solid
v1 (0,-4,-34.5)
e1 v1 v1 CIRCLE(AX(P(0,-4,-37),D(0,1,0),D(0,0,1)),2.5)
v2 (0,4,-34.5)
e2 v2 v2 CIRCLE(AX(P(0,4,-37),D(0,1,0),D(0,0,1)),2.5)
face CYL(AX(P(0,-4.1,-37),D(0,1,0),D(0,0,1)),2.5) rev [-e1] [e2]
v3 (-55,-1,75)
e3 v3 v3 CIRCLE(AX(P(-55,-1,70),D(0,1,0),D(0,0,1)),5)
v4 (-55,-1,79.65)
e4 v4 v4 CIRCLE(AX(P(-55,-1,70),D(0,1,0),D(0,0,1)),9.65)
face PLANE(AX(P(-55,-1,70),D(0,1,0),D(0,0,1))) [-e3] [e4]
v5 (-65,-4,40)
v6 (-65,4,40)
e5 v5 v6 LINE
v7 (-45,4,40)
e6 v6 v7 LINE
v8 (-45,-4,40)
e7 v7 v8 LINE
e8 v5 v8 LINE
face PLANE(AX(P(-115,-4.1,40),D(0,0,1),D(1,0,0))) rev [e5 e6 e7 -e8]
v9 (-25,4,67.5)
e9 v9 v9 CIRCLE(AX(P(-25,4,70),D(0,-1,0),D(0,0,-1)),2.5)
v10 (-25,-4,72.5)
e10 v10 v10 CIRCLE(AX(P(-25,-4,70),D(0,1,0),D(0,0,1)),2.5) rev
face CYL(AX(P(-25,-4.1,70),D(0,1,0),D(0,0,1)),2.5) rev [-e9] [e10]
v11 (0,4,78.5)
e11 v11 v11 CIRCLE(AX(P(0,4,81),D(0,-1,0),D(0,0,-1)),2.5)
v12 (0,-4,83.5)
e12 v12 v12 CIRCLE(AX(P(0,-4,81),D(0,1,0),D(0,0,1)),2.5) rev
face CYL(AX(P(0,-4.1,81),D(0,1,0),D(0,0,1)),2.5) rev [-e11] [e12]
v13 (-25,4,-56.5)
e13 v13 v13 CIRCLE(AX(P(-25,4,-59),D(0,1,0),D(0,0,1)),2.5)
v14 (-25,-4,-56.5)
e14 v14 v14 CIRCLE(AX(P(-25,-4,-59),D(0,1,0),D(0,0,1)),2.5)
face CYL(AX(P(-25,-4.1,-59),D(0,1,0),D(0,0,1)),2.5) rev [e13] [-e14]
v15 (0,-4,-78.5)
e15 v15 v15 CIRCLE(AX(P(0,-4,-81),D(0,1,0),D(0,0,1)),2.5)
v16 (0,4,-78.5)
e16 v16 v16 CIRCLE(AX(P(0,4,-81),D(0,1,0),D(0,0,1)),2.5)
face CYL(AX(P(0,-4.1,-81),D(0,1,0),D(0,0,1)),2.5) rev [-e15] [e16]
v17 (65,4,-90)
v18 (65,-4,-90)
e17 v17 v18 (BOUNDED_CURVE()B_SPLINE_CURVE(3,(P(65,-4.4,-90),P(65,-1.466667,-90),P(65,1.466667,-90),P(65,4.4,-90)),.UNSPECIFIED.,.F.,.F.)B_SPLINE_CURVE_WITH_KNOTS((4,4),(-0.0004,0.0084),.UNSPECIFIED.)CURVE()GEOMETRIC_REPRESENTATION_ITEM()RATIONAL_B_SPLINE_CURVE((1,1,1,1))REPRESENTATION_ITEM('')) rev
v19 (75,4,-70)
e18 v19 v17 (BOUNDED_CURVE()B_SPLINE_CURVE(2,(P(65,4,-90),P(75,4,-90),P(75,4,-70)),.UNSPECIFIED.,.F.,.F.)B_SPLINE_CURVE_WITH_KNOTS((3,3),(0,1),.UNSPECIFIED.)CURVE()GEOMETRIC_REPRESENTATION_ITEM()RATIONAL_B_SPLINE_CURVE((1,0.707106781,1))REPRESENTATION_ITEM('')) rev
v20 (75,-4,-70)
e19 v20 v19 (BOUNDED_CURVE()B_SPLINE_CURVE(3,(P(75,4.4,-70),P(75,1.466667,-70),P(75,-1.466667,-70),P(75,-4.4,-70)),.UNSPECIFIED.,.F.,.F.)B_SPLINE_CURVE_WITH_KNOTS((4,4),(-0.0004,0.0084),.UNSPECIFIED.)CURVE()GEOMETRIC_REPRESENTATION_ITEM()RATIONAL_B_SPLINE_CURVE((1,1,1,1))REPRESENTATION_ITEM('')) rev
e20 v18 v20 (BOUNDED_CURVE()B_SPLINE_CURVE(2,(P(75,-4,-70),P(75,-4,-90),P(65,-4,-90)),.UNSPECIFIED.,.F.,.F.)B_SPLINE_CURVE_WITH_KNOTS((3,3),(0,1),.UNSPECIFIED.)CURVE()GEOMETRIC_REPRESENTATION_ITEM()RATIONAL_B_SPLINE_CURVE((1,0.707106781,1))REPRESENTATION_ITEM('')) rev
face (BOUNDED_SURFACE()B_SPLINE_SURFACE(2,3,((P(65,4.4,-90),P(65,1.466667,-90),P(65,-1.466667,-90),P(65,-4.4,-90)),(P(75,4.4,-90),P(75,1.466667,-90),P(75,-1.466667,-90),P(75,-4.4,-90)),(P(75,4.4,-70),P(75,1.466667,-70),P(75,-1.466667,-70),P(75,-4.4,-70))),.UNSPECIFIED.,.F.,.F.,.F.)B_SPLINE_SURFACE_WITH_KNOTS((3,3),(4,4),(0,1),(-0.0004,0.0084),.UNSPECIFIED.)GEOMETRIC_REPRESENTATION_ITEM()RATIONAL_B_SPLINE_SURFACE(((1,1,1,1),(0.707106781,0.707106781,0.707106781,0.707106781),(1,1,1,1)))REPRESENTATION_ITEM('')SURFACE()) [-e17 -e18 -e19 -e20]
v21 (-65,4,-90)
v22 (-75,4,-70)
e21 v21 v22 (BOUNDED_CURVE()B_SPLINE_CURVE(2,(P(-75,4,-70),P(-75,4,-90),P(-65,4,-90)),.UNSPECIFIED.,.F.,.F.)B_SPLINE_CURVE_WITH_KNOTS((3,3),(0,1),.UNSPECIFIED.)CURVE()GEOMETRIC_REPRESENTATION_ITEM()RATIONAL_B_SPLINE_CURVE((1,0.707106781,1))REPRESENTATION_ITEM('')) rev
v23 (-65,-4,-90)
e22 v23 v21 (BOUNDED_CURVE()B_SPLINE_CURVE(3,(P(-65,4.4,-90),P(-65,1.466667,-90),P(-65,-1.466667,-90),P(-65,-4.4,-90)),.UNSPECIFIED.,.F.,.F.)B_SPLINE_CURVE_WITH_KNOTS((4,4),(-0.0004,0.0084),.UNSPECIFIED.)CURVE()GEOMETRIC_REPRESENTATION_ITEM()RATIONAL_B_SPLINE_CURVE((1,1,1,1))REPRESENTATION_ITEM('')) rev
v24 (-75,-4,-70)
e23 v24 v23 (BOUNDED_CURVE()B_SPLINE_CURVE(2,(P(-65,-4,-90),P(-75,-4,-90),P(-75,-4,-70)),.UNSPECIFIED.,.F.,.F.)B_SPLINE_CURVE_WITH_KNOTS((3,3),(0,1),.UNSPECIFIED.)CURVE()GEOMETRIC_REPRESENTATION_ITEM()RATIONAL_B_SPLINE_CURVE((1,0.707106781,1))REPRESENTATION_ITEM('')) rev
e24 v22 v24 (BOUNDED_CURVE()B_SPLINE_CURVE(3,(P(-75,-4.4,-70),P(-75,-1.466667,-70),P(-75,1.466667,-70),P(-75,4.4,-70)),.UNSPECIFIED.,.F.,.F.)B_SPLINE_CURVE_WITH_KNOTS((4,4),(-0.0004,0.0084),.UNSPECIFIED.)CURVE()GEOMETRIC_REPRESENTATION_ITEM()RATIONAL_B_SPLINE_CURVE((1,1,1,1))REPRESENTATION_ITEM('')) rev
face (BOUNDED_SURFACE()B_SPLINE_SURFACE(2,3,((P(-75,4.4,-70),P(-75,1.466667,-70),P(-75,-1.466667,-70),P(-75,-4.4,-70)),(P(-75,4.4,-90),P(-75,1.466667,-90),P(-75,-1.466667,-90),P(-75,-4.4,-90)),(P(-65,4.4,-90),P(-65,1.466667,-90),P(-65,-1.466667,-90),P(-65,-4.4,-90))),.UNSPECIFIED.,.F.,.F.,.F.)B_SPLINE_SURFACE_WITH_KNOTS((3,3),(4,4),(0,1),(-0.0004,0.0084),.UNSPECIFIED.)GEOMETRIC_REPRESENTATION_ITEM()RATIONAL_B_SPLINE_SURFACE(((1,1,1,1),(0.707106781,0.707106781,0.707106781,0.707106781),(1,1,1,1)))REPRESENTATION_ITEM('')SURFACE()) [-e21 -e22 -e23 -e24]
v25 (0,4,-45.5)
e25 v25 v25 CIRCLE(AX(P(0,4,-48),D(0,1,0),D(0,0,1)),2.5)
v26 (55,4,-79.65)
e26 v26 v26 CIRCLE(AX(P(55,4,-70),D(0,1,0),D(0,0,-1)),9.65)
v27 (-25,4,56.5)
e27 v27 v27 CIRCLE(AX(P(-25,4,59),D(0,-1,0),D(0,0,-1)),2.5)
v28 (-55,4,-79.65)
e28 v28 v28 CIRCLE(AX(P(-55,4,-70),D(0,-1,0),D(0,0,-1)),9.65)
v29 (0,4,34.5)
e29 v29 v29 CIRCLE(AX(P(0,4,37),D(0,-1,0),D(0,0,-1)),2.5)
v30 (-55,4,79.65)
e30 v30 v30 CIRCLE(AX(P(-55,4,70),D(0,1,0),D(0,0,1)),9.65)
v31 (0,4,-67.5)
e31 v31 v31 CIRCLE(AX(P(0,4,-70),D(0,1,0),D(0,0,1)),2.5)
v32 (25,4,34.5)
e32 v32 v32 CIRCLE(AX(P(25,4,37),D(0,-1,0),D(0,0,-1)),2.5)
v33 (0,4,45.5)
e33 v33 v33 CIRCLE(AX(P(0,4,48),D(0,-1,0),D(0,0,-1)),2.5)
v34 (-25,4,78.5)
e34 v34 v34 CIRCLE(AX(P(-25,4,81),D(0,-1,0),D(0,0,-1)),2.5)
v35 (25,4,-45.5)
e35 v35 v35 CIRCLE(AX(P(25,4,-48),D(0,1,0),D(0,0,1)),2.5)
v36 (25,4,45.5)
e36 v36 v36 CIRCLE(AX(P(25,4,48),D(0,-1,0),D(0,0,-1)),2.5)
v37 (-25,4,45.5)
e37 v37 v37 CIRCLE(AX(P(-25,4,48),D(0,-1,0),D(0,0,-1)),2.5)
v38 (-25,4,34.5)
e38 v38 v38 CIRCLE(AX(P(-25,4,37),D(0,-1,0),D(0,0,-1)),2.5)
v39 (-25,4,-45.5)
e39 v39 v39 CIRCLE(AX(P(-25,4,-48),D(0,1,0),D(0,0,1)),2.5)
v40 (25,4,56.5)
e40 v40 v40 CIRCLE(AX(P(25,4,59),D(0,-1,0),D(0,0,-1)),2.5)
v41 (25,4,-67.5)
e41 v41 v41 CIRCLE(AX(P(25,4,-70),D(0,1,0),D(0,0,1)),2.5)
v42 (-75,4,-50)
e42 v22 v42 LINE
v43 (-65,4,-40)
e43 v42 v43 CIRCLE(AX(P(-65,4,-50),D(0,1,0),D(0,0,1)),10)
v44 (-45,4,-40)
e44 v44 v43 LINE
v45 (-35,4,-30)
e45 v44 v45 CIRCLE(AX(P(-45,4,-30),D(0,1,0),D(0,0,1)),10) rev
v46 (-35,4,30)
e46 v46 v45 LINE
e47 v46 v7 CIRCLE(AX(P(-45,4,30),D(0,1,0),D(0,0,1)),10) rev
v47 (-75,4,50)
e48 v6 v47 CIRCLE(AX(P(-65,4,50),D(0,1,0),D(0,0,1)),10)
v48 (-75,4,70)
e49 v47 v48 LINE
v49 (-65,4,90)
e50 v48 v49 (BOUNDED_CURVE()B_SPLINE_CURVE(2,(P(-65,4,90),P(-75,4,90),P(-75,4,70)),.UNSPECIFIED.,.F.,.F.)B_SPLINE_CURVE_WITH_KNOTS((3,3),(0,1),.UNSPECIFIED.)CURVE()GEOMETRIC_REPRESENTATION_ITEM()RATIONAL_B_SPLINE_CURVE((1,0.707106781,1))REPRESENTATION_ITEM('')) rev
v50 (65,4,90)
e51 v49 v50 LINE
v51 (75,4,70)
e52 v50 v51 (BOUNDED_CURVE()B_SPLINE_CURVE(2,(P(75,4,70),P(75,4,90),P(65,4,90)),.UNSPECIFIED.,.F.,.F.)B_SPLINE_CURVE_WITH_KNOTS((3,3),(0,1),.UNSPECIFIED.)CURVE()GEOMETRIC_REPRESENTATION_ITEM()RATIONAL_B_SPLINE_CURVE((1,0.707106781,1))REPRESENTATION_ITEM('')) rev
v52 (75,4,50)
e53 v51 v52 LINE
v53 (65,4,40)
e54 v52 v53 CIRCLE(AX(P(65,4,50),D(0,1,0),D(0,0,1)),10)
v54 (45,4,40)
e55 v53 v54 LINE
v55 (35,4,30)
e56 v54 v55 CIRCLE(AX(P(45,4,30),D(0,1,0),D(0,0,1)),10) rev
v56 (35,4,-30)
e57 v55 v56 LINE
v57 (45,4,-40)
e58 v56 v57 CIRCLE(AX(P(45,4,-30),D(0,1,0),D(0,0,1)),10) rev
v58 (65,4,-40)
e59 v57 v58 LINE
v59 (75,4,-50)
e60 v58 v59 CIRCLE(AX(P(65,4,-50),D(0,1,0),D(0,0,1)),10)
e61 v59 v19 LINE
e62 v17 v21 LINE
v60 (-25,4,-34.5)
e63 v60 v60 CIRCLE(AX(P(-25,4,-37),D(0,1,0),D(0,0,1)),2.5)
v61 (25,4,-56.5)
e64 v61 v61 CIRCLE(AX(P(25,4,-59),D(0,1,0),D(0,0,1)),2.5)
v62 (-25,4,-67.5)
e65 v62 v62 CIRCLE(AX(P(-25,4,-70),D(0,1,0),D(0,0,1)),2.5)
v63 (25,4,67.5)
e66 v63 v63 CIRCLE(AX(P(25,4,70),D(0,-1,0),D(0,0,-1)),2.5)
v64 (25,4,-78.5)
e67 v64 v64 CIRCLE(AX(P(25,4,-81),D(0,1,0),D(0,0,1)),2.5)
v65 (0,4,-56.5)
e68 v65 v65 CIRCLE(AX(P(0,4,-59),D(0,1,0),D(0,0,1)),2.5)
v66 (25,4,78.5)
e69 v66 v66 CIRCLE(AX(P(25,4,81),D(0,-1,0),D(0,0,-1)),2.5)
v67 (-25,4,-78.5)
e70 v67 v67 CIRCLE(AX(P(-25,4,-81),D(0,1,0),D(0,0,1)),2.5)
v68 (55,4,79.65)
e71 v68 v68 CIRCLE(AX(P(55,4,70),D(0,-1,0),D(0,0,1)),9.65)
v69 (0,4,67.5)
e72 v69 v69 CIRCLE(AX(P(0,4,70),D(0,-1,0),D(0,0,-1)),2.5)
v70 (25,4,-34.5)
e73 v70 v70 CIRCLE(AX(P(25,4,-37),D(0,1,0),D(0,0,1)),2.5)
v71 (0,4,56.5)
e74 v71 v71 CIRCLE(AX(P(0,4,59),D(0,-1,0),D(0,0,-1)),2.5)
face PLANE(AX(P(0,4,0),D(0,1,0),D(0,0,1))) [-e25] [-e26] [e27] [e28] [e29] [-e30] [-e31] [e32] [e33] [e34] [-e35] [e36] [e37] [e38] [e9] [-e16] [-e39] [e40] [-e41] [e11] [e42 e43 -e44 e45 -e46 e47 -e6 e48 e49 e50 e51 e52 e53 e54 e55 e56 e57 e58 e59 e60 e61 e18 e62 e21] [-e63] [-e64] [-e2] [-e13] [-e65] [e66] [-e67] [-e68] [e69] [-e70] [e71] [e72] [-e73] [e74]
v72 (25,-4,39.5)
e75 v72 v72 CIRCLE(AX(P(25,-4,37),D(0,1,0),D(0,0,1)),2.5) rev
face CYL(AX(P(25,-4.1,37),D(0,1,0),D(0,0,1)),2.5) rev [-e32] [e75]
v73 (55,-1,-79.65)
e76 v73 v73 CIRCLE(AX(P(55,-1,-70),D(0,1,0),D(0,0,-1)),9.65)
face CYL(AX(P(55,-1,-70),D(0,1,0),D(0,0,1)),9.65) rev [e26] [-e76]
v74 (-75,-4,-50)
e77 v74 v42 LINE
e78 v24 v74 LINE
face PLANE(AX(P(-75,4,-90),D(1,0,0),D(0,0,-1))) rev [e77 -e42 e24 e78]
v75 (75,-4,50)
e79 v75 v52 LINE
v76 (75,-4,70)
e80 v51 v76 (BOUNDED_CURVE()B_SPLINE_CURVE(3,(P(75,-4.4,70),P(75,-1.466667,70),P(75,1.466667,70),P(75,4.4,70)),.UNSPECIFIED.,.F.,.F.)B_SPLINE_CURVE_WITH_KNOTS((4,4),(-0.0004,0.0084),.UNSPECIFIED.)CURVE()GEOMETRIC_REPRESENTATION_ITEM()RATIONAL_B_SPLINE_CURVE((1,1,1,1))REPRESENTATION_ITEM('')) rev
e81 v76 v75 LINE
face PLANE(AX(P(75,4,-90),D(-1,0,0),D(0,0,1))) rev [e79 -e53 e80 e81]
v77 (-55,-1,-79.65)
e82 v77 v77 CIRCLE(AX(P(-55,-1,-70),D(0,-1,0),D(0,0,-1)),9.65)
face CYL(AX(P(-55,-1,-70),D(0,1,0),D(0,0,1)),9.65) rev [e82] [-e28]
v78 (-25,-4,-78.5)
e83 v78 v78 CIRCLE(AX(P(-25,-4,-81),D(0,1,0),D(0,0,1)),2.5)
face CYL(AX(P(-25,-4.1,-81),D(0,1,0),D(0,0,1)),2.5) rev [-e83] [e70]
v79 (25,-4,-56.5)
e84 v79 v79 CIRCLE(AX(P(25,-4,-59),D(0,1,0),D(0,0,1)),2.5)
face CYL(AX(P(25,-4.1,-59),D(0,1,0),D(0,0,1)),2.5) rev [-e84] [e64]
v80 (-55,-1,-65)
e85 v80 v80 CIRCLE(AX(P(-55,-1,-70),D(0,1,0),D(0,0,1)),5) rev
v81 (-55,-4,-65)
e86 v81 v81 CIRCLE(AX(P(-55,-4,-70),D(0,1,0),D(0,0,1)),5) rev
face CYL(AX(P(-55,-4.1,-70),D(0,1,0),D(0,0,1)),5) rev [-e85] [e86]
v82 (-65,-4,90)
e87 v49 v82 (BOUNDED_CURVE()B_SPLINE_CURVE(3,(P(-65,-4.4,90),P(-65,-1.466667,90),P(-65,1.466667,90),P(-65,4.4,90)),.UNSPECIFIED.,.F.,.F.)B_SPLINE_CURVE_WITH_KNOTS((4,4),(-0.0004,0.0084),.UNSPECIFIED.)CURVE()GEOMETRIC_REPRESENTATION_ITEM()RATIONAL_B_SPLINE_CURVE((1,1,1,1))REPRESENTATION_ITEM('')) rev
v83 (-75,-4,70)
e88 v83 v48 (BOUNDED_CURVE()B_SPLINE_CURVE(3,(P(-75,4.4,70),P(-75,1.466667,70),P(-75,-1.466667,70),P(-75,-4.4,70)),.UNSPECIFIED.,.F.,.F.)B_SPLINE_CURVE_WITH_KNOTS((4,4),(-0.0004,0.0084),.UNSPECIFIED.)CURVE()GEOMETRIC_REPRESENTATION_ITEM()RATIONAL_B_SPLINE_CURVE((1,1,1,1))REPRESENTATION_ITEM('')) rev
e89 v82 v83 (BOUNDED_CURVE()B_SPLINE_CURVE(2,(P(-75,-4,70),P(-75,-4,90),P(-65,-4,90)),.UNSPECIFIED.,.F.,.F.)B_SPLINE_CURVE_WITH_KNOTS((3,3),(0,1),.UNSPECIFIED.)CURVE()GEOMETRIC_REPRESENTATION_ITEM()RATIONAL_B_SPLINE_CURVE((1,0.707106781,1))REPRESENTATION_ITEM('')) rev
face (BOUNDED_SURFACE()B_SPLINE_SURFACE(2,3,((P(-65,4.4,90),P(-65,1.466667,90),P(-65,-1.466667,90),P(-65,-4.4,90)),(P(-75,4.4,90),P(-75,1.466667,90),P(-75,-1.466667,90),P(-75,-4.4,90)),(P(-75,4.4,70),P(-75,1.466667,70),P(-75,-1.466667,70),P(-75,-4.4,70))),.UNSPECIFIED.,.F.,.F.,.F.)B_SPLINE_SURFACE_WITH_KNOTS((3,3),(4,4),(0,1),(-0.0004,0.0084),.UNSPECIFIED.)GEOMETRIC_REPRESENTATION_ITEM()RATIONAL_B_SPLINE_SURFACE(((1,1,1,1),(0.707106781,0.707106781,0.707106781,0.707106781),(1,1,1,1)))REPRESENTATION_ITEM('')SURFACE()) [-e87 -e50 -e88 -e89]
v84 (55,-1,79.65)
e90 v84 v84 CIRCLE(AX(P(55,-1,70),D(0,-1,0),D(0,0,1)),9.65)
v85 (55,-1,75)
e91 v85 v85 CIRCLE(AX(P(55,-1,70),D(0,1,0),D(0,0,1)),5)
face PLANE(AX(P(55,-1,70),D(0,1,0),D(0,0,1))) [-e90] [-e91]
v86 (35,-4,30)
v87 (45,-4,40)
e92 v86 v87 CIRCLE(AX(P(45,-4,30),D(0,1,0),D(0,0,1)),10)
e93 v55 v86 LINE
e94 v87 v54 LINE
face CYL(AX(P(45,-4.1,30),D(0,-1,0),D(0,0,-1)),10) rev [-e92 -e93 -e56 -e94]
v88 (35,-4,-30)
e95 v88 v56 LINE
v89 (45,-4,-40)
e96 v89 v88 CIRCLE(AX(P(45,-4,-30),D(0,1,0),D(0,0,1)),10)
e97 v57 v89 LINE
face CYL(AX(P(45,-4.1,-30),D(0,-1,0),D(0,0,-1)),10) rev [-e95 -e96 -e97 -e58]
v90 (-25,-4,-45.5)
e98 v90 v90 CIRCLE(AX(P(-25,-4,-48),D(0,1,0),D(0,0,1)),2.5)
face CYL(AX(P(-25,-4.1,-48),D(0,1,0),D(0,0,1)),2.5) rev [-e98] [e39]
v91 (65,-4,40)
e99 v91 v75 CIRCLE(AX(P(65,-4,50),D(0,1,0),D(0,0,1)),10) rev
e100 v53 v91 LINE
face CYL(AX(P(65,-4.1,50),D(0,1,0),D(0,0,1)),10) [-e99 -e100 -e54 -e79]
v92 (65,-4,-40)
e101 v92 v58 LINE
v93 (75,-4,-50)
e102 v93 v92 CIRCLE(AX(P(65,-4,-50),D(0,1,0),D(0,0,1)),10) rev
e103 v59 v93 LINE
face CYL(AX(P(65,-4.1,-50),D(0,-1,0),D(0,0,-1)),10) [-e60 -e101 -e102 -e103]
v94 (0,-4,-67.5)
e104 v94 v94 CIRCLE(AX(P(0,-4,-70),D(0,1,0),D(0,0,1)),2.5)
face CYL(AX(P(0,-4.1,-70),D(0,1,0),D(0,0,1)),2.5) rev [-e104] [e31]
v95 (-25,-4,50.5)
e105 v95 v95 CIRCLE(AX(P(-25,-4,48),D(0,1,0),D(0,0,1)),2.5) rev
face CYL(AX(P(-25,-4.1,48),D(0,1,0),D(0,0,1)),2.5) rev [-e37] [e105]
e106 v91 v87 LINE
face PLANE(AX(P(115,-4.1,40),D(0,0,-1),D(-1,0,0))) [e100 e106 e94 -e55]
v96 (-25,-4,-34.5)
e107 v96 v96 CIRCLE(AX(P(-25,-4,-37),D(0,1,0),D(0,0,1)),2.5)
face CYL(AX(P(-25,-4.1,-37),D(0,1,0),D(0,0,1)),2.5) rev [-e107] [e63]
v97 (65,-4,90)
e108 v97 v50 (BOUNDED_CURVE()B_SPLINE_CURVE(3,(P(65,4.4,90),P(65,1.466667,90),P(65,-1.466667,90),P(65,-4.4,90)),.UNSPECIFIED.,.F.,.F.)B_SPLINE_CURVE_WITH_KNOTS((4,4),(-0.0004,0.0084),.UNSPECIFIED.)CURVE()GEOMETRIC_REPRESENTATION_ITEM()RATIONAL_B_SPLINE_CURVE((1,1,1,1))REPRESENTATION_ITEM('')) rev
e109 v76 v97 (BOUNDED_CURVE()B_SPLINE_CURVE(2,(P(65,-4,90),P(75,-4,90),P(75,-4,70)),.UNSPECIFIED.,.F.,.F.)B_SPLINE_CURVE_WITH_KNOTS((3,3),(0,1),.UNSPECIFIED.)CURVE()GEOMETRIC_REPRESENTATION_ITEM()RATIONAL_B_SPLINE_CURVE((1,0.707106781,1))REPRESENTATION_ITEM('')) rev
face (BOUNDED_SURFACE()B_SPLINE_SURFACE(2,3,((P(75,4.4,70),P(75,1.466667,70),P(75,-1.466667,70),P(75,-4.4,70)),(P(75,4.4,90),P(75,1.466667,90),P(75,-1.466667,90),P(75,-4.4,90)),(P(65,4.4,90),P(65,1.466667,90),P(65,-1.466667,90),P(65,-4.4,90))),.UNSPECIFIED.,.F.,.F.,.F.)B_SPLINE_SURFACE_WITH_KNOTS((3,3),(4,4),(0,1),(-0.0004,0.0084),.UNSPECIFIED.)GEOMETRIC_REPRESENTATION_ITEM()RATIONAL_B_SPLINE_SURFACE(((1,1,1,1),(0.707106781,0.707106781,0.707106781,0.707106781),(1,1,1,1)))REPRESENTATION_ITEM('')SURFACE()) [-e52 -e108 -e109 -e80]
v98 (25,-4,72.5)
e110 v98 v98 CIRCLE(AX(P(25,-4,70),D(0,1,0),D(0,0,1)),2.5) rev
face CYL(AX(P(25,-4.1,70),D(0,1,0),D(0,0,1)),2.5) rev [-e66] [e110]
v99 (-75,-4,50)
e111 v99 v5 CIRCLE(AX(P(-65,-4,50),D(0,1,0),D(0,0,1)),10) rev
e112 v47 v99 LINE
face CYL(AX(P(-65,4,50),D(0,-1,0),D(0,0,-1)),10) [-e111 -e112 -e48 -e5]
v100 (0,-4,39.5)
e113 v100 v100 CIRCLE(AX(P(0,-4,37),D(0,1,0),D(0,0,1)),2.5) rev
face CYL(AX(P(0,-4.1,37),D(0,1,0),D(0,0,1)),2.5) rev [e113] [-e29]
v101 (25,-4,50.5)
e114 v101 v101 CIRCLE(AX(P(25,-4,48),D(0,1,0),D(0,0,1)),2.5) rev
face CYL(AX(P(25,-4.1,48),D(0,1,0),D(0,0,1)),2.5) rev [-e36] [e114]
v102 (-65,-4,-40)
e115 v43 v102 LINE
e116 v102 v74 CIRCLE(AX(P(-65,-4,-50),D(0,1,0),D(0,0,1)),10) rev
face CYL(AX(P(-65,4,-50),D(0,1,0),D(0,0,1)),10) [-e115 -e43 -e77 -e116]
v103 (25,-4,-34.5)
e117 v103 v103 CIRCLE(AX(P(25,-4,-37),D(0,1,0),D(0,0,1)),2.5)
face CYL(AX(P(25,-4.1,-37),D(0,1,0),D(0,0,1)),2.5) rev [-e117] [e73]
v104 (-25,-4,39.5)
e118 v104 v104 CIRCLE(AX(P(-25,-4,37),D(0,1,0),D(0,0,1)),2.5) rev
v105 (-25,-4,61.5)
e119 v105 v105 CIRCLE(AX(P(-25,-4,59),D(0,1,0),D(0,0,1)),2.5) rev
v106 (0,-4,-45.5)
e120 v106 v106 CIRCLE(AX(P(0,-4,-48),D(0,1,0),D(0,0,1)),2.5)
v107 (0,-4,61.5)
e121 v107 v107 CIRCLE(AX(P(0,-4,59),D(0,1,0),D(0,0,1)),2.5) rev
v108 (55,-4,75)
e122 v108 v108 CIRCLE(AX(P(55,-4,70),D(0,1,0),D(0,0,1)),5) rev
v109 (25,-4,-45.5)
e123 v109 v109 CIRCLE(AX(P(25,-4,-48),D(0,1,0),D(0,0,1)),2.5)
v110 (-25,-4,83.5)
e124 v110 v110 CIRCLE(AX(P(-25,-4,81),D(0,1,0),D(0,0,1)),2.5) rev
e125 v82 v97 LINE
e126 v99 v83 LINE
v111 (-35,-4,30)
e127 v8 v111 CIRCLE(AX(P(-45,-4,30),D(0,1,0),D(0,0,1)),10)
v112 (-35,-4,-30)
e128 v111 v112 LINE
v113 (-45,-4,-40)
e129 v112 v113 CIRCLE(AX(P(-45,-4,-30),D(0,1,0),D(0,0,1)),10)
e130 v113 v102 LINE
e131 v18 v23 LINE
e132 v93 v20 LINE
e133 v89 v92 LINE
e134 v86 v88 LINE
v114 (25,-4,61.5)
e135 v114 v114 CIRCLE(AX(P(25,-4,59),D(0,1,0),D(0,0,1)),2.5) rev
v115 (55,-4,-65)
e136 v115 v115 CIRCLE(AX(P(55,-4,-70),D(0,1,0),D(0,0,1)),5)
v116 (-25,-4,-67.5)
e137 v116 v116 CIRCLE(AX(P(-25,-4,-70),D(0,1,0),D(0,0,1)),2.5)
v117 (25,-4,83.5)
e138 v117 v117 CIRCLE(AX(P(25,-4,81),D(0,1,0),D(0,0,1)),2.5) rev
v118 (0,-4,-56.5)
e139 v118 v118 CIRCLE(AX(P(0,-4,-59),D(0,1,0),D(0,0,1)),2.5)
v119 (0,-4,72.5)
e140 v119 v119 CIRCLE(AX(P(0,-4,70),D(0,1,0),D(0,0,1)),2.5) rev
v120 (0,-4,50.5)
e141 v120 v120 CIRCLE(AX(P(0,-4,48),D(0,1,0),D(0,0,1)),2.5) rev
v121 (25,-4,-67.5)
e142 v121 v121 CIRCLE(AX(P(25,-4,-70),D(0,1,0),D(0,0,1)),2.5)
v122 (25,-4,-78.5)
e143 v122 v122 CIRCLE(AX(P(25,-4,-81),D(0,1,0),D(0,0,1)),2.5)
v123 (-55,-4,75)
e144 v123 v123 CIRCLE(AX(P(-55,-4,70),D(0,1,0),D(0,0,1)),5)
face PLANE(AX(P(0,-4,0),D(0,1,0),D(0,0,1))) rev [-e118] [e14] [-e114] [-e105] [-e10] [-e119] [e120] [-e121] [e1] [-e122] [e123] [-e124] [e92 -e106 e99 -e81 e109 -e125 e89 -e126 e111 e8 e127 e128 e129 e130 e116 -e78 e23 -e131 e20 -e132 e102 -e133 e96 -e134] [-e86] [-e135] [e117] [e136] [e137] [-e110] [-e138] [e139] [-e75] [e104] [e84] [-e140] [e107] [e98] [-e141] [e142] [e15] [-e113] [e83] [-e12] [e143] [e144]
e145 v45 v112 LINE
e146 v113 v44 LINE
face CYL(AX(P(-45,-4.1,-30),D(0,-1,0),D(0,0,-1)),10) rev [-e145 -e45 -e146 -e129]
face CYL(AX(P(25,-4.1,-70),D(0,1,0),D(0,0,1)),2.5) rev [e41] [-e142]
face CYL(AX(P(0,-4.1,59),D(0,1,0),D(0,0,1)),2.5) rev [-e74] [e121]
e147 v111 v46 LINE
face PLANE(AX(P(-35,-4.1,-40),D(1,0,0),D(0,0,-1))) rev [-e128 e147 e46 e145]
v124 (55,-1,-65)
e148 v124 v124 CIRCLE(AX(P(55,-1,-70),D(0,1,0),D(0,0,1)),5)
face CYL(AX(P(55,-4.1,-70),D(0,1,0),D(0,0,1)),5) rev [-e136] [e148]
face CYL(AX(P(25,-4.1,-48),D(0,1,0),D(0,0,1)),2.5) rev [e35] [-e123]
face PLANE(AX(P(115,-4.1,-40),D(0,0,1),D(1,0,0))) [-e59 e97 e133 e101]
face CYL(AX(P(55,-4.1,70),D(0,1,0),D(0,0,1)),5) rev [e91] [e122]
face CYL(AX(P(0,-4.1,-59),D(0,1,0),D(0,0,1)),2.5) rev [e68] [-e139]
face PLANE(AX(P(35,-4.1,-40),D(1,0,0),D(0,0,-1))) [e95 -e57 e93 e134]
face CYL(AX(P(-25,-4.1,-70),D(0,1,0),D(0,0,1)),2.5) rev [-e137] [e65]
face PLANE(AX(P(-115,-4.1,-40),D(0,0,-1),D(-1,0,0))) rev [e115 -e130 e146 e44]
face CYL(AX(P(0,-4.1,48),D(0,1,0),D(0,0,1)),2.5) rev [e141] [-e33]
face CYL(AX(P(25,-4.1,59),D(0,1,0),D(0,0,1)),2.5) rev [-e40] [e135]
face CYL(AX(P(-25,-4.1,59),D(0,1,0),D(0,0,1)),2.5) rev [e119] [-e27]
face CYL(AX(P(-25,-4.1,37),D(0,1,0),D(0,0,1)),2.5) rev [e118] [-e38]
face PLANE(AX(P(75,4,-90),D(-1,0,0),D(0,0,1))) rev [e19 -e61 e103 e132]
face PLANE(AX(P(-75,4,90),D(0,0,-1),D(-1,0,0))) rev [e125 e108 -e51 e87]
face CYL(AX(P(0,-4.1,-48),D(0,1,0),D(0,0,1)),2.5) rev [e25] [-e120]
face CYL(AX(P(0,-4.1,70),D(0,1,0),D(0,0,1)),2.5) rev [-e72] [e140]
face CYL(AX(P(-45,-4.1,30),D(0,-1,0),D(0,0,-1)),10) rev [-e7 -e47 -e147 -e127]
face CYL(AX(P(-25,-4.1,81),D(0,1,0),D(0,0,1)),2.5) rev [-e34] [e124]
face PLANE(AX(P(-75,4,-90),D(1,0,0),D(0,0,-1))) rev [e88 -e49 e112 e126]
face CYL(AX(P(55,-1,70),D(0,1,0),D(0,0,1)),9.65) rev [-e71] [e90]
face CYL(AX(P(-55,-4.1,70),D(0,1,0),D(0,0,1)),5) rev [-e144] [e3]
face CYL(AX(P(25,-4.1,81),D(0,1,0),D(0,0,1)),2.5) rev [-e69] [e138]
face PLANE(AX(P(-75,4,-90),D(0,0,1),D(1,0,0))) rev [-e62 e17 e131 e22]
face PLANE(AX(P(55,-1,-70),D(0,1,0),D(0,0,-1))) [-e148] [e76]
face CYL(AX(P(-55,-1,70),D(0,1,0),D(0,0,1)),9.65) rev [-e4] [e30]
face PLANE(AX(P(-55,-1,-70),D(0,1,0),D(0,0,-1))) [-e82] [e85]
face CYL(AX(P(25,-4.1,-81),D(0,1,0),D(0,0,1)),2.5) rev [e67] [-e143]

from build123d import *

# Parameters (mm, degrees)
SKETCH2_W               = 150
SKETCH2_H               = 180
BOSS_EXTRUDE1_DEPTH     = 4
FILLET1_SIZE            = 10
FILLET1_SIZE_2          = 20
FILLET2_SIZE            = 10
FILLET2_SIZE_2          = 20
SKETCH3_R               = 9.65
CUT_EXTRUDE1_DEPTH      = 5
SKETCH7_R               = 5
CUT_EXTRUDE4_DEPTH      = 118.426572949
MIRROR2_COPY_1_SKETCH_R = 9.65
MIRROR2_COPY_1_DEPTH    = 5
MIRROR2_COPY_2_SKETCH_R = 5
MIRROR2_COPY_2_DEPTH    = 118.426572949
SKETCH4_W               = 80
SKETCH4_H               = 80
CUT_EXTRUDE2_DEPTH      = 118.426572949
FILLET3_R               = 10
SKETCH6_R               = 2.5
CUT_EXTRUDE3_DEPTH      = 118.426572949


with BuildPart() as part:
    # Sketch2 → Boss-Extrude1 (new, symmetric)
    with BuildSketch(Plane(origin=(0, 0, 0), x_dir=(1, 0, 0), z_dir=(0, 1, 0))):
        Rectangle(SKETCH2_W, SKETCH2_H)
    extrude(amount=BOSS_EXTRUDE1_DEPTH, both=True)

    # Fillet1
    # an asymmetric fillet: 20, 10 mm, written as the material it takes off along each edge
    with BuildSketch(Plane(origin=(-75, -54, -90), x_dir=(1, 0, 0), z_dir=(0, 1, 0))) as fillet1_piece_1:
        with BuildLine():
            Bezier((FILLET1_SIZE, 0), (0, 0), (0, -FILLET1_SIZE_2), weights=[1, 0.707106781, 1])
            Line((0, -FILLET1_SIZE_2), (0, 0))
            Line((0, 0), (FILLET1_SIZE, 0))
        make_face()
    extrude(amount=108, mode=Mode.SUBTRACT)
    with BuildSketch(Plane(origin=(75, 54, 90), x_dir=(-1, 0, 0), z_dir=(0, -1, 0))) as fillet1_piece_2:
        with BuildLine():
            Bezier((FILLET1_SIZE, 0), (0, 0), (0, FILLET1_SIZE_2), weights=[1, 0.707106781, 1])
            Line((0, FILLET1_SIZE_2), (0, 0))
            Line((0, 0), (FILLET1_SIZE, 0))
        make_face()
    extrude(amount=108, mode=Mode.SUBTRACT)

    # Fillet2
    # an asymmetric fillet: 20, 10 mm, written as the material it takes off along each edge
    with BuildSketch(Plane(origin=(75, 54, -90), x_dir=(-1, 0, 0), z_dir=(0, -1, 0))) as fillet2_piece_1:
        with BuildLine():
            Bezier((FILLET2_SIZE, 0), (0, 0), (0, -FILLET2_SIZE_2), weights=[1, 0.707106781, 1])
            Line((0, -FILLET2_SIZE_2), (0, 0))
            Line((0, 0), (FILLET2_SIZE, 0))
        make_face()
    extrude(amount=108, mode=Mode.SUBTRACT)
    with BuildSketch(Plane(origin=(-75, -54, 90), x_dir=(0, 0, -1), z_dir=(0, 1, 0))) as fillet2_piece_2:
        with BuildLine():
            Bezier((FILLET2_SIZE_2, 0), (0, 0), (0, -FILLET2_SIZE), weights=[1, 0.707106781, 1])
            Line((0, -FILLET2_SIZE), (0, 0))
            Line((0, 0), (FILLET2_SIZE_2, 0))
        make_face()
    extrude(amount=108, mode=Mode.SUBTRACT)

    # Sketch3 → Cut-Extrude1 (cut)
    with BuildSketch(Plane(origin=(0, 4, 0), x_dir=(1, 0, 0), z_dir=(0, 1, 0))):
        with Locations(Location((-55, -70, 0), (0, 0, 270))):
            Circle(SKETCH3_R)
    cut_extrude1 = extrude(amount=-CUT_EXTRUDE1_DEPTH, mode=Mode.SUBTRACT)

    # Sketch7 → Cut-Extrude4 (cut, through all)
    with BuildSketch(Plane(origin=(0, 4, 0), x_dir=(1, 0, 0), z_dir=(0, 1, 0))):
        with Locations(Location((-55, -70, 0), (0, 0, 270))):
            Circle(SKETCH7_R)
    cut_extrude4 = extrude(amount=-CUT_EXTRUDE4_DEPTH, mode=Mode.SUBTRACT)

    # Mirror1: Cut-Extrude1, Cut-Extrude4 across plane
    add(cut_extrude1.mirror(Plane.XY), mode=Mode.SUBTRACT)
    add(cut_extrude4.mirror(Plane.XY), mode=Mode.SUBTRACT)

    # Mirror2: Cut-Extrude1, Cut-Extrude4 across plane
    add(cut_extrude1.mirror(Plane(origin=(0, 0, 0), x_dir=(0, 0, 1), z_dir=(1, 0, 0))), mode=Mode.SUBTRACT)
    add(cut_extrude4.mirror(Plane(origin=(0, 0, 0), x_dir=(0, 0, 1), z_dir=(1, 0, 0))), mode=Mode.SUBTRACT)

    # Mirror2 copy 1 sketch → Mirror2 copy 1 (cut)
    with BuildSketch(Plane(origin=(0, 4, 0), x_dir=(-1, 0, 0), z_dir=(0, 1, 0))):
        with Locations(Location((-55, -70, 0), (0, 0, 270))):
            Circle(MIRROR2_COPY_1_SKETCH_R)
    extrude(amount=-MIRROR2_COPY_1_DEPTH, mode=Mode.SUBTRACT)

    # Mirror2 copy 2 sketch → Mirror2 copy 2 (cut, through all)
    with BuildSketch(Plane(origin=(0, 4, 0), x_dir=(-1, 0, 0), z_dir=(0, 1, 0))):
        with Locations(Location((-55, -70, 0), (0, 0, 270))):
            Circle(MIRROR2_COPY_2_SKETCH_R)
    extrude(amount=-MIRROR2_COPY_2_DEPTH, mode=Mode.SUBTRACT)

    # Sketch4 → Cut-Extrude2 (cut, through all)
    with BuildSketch(Plane(origin=(0, 4, 0), x_dir=(1, 0, 0), z_dir=(0, 1, 0))):
        with Locations((-75, 0)):
            Rectangle(SKETCH4_W, SKETCH4_H)
    cut_extrude2 = extrude(amount=-CUT_EXTRUDE2_DEPTH, mode=Mode.SUBTRACT)

    # Mirror3: Cut-Extrude2 across plane
    add(cut_extrude2.mirror(Plane(origin=(0, 0, 0), x_dir=(0, 0, 1), z_dir=(1, 0, 0))), mode=Mode.SUBTRACT)

    # Fillet3
    fillet3_edges = [part.edges().sort_by_distance(p)[0] for p in [
        (75, 0, -40),
        (75, 0, 40),
        (-75, 0, -40),
        (-75, 0, 40),
        (-35, 0, -40),
        (-35, 0, 40),
        (35, 0, 40),
        (35, 0, -40),
    ]]
    fillet(fillet3_edges, radius=FILLET3_R)

    # Sketch6 → Cut-Extrude3 (cut, through all)
    with BuildSketch(Plane(origin=(0, 4, 0), x_dir=(1, 0, 0), z_dir=(0, 1, 0))):
        with Locations(Location((-25, 81, 0), (0, 0, 270))):
            Circle(SKETCH6_R)
        with Locations(Location((25, 81, 0), (0, 0, 270))):
            Circle(SKETCH6_R)
        with Locations(Location((0, 81, 0), (0, 0, 270))):
            Circle(SKETCH6_R)
        with Locations(Location((-25, 70, 0), (0, 0, 270))):
            Circle(SKETCH6_R)
        with Locations(Location((0, 70, 0), (0, 0, 270))):
            Circle(SKETCH6_R)
        with Locations(Location((25, 70, 0), (0, 0, 270))):
            Circle(SKETCH6_R)
        with Locations(Location((-25, 59, 0), (0, 0, 270))):
            Circle(SKETCH6_R)
        with Locations(Location((0, 59, 0), (0, 0, 270))):
            Circle(SKETCH6_R)
        with Locations(Location((25, 59, 0), (0, 0, 270))):
            Circle(SKETCH6_R)
        with Locations(Location((-25, 48, 0), (0, 0, 270))):
            Circle(SKETCH6_R)
        with Locations(Location((0, 48, 0), (0, 0, 270))):
            Circle(SKETCH6_R)
        with Locations(Location((25, 48, 0), (0, 0, 270))):
            Circle(SKETCH6_R)
        with Locations(Location((-25, 37, 0), (0, 0, 270))):
            Circle(SKETCH6_R)
        with Locations(Location((0, 37, 0), (0, 0, 270))):
            Circle(SKETCH6_R)
        with Locations(Location((25, 37, 0), (0, 0, 270))):
            Circle(SKETCH6_R)
    cut_extrude3 = extrude(amount=-CUT_EXTRUDE3_DEPTH, mode=Mode.SUBTRACT)

    # Mirror4: Cut-Extrude3 across plane
    add(cut_extrude3.mirror(Plane.XY), mode=Mode.SUBTRACT)


solid = part.part
